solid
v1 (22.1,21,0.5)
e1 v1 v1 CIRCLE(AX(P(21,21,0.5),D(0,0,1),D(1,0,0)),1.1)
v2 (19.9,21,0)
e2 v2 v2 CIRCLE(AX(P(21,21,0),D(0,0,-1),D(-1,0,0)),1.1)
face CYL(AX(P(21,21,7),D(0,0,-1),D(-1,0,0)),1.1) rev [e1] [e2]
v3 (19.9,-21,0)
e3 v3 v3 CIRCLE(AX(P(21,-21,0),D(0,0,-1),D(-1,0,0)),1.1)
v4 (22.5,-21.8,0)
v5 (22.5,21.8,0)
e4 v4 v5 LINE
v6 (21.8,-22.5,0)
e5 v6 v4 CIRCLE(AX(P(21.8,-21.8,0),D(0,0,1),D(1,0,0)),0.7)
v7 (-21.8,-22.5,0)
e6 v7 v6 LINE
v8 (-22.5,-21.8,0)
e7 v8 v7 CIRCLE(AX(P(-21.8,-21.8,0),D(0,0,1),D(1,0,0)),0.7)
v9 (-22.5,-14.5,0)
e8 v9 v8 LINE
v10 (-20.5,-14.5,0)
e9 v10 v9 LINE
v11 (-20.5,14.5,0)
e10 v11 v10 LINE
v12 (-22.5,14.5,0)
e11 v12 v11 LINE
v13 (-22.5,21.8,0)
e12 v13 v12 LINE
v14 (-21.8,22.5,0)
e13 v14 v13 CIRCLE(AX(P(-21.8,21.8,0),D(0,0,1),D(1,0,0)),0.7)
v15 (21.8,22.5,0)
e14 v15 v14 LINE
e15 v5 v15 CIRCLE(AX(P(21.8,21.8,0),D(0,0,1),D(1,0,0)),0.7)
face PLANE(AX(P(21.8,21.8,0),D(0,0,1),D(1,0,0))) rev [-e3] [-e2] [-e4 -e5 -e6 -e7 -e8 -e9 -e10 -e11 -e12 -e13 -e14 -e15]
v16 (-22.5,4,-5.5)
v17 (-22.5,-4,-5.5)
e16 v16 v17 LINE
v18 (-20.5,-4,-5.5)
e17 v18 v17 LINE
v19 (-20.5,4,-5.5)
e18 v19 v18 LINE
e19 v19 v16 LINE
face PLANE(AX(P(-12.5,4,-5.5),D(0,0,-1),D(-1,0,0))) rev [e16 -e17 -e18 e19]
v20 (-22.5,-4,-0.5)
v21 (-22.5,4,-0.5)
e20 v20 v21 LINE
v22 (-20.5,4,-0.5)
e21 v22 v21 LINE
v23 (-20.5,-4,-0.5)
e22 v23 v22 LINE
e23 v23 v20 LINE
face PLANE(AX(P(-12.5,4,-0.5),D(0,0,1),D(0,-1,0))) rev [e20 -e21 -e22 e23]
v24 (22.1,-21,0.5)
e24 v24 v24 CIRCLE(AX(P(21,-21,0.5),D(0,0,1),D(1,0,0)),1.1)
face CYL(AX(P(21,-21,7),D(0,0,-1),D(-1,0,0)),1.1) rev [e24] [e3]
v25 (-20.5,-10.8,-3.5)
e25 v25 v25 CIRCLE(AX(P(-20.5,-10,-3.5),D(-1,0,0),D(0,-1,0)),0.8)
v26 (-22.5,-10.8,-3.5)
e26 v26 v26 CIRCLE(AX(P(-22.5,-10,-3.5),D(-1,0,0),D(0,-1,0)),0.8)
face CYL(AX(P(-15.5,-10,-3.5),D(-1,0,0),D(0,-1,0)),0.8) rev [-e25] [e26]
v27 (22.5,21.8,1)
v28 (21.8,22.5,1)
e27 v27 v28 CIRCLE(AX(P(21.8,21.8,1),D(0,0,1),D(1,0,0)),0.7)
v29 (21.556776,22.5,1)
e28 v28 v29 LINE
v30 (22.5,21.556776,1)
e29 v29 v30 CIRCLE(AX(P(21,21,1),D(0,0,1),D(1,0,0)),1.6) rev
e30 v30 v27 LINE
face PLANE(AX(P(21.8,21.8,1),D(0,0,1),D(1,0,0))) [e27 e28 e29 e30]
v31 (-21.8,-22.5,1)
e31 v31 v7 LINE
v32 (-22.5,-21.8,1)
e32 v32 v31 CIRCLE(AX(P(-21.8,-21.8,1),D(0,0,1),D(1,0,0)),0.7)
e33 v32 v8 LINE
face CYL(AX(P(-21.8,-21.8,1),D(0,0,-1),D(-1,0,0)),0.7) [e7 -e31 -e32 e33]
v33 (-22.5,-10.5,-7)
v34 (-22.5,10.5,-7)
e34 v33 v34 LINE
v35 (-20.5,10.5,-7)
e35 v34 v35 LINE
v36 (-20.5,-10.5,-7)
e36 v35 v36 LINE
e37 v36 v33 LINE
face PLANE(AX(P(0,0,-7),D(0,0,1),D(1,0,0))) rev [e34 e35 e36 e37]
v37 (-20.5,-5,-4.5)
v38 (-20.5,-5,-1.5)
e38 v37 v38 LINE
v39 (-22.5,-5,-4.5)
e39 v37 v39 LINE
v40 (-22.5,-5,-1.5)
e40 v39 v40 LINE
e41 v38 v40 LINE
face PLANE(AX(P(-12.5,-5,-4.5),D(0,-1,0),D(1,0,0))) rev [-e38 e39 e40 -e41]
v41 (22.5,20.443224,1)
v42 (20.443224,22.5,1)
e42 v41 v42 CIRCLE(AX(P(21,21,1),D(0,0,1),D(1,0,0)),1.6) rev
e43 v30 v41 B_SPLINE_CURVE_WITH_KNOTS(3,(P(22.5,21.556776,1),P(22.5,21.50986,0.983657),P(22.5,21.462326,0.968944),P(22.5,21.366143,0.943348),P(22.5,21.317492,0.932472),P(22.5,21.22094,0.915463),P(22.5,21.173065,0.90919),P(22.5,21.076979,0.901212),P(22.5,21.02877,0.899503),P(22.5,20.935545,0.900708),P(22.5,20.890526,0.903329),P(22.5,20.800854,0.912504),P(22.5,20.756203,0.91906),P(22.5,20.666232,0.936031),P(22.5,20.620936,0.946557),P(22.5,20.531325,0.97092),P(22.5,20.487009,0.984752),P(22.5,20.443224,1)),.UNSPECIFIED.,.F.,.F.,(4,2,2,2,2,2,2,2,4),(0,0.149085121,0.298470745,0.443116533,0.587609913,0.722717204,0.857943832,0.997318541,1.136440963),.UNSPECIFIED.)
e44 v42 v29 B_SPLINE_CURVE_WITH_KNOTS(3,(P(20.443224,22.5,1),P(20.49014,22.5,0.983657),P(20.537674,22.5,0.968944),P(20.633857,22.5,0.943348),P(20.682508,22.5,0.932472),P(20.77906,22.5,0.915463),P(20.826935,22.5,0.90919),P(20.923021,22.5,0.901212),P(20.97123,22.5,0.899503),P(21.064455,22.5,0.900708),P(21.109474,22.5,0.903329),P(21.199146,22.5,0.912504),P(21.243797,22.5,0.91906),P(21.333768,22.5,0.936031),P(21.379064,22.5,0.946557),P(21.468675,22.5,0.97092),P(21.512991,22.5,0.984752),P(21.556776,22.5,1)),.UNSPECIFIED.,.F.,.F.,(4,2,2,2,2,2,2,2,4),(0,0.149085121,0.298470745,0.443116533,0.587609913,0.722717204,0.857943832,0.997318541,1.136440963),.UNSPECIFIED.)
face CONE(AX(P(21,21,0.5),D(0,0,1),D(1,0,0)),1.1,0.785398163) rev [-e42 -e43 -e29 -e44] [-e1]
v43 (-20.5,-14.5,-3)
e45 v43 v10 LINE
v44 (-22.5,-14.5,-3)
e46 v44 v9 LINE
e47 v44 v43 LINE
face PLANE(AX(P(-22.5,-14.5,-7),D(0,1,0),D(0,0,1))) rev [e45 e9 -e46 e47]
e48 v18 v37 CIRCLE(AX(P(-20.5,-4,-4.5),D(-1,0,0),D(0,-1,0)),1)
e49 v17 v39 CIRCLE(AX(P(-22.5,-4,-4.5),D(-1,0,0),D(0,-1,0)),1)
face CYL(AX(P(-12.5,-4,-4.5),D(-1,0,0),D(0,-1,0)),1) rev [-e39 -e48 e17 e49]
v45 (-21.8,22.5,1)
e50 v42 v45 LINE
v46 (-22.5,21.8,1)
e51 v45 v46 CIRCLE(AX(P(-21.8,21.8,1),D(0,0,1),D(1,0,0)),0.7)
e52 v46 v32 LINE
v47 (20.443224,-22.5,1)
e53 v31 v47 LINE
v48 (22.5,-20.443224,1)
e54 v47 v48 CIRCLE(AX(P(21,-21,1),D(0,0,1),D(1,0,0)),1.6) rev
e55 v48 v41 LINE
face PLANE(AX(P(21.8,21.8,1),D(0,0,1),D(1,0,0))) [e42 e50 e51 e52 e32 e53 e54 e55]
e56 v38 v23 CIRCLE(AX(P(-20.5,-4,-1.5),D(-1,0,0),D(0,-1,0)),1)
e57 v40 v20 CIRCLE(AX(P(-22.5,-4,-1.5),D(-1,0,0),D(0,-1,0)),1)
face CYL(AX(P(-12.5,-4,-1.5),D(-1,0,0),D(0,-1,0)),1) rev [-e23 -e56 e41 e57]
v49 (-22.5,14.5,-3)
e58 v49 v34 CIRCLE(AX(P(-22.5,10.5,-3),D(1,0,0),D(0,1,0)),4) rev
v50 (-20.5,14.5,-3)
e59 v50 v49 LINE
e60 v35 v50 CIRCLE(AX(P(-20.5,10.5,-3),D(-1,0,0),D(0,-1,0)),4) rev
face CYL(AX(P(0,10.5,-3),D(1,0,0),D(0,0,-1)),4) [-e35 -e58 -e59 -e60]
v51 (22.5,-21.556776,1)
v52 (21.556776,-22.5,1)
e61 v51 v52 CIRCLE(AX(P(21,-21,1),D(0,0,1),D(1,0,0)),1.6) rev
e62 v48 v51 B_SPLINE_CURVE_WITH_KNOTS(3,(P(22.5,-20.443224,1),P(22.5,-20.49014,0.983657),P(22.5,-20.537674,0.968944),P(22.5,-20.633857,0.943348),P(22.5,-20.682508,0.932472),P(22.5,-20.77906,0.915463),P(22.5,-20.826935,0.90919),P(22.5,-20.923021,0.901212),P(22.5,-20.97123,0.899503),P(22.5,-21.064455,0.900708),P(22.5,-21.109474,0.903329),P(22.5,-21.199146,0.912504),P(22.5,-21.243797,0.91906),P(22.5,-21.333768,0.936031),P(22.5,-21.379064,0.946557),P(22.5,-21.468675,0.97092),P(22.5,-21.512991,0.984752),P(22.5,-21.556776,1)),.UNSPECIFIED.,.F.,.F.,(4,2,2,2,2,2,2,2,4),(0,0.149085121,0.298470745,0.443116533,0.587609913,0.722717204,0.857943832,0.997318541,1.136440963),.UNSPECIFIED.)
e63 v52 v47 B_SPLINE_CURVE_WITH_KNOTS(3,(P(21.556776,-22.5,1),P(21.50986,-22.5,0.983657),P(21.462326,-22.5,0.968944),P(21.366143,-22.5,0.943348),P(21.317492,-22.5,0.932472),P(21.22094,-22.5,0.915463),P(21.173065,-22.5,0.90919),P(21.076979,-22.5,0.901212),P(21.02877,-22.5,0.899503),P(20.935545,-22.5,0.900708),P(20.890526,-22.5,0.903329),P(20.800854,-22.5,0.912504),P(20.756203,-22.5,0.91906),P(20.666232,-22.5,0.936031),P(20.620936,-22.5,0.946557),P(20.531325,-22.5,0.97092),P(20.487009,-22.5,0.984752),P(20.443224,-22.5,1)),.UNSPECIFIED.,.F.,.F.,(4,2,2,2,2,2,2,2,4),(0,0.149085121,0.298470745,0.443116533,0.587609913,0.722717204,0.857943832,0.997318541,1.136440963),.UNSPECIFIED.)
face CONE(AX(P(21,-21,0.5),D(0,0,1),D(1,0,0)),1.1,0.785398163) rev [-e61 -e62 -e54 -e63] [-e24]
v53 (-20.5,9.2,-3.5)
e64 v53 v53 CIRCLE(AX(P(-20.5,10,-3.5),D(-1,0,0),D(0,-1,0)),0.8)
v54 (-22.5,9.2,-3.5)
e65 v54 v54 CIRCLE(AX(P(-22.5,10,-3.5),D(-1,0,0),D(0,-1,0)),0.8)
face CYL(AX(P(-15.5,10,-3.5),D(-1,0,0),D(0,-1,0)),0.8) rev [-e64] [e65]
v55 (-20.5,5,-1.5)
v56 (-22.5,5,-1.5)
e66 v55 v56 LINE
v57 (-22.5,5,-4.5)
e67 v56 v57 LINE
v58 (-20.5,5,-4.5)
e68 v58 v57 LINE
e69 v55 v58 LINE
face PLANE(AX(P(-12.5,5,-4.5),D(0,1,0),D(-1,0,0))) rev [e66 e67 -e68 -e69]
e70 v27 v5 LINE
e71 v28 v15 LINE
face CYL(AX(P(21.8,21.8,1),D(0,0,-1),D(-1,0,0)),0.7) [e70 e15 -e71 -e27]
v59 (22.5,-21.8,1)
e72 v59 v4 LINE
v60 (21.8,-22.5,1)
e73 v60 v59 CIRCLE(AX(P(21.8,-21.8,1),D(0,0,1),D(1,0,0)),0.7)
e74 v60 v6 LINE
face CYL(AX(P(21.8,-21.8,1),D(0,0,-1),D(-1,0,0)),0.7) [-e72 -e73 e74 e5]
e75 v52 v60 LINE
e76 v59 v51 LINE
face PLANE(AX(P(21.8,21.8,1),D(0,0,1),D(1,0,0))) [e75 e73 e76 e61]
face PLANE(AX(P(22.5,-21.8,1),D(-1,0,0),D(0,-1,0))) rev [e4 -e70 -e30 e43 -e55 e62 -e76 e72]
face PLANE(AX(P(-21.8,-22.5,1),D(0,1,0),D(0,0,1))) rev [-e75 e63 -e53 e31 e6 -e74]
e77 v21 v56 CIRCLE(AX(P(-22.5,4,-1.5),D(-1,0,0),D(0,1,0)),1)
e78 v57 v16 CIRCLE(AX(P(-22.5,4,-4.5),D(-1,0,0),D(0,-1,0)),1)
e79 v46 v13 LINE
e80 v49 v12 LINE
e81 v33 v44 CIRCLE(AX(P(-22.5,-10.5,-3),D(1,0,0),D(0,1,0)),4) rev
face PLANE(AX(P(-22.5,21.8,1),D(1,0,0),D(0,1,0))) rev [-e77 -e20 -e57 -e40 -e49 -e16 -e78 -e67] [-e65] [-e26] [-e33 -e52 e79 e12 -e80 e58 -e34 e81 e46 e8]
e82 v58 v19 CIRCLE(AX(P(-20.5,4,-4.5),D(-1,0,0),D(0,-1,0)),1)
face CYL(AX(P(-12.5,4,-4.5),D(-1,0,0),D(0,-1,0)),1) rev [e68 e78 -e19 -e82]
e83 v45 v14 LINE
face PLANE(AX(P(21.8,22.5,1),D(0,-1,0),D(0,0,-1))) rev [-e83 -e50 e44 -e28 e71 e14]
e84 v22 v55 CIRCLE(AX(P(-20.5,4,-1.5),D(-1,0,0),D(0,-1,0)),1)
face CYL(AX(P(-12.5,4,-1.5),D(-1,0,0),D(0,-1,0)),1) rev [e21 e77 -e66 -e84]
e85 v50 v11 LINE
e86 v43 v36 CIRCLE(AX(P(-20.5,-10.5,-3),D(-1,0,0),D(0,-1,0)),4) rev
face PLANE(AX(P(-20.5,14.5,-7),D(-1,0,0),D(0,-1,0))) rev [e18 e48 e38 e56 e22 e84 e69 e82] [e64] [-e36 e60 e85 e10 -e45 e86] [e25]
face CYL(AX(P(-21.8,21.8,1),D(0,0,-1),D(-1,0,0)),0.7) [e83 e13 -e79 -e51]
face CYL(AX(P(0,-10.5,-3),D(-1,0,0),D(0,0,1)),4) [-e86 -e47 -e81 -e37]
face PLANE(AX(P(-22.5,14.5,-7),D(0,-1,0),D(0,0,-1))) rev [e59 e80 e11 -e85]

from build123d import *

# Parameters (mm, degrees)
EXTRUDE_1_DEPTH     = 1
SKETCH_2_W          = 2
SKETCH_2_H          = 29
EXTRUDE_2_DEPTH     = 7
SKETCH_3_R          = 1.1
CUT_EXTRUDE_1_DEPTH = 7
SKETCH_4_R          = 0.8
CUT_EXTRUDE_2_DEPTH = 7
CHAMFER_1_SIZE      = 0.5
FILLET_1_R          = 4
CUT_EXTRUDE_3_DEPTH = 10


with BuildPart() as part:
    # 草图1 → 凸台-拉伸1 (new body)
    with BuildSketch(Plane.XY):
        with BuildLine():
            Line((22.5, -21.8), (22.5, 21.8))
            ThreePointArc((22.5, 21.8), (22.294974747, 22.294974747), (21.8, 22.5))
            Line((21.8, 22.5), (-21.8, 22.5))
            ThreePointArc((-21.8, 22.5), (-22.294974747, 22.294974747), (-22.5, 21.8))
            Line((-22.5, 21.8), (-22.5, -21.8))
            ThreePointArc((-22.5, -21.8), (-22.294974747, -22.294974747), (-21.8, -22.5))
            Line((-21.8, -22.5), (21.8, -22.5))
            ThreePointArc((21.8, -22.5), (22.294974747, -22.294974747), (22.5, -21.8))
        make_face()
    extrude(amount=EXTRUDE_1_DEPTH)

    # 草图2 → 凸台-拉伸2 (add)
    with BuildSketch(Plane(origin=(0, 0, 0), x_dir=(-1, 0, 0), z_dir=(0, 0, -1))):
        with Locations((21.5, 0)):
            Rectangle(SKETCH_2_W, SKETCH_2_H)
    extrude(amount=EXTRUDE_2_DEPTH)

    # 草图3 → 切除-拉伸1 (cut)
    with BuildSketch(Plane(origin=(0, 0, 0), x_dir=(-1, 0, 0), z_dir=(0, 0, -1))):
        with Locations((-21, 21)):
            Circle(SKETCH_3_R)
        with Locations((-21, -21)):
            Circle(SKETCH_3_R)
    extrude(amount=-CUT_EXTRUDE_1_DEPTH, mode=Mode.SUBTRACT)

    # 草图4 → 切除-拉伸2 (cut)
    with BuildSketch(Plane.ZY.offset(22.5)):
        with Locations(Location((-3.5, 10, 0), (0, 0, 270))):
            Circle(SKETCH_4_R)
        with Locations(Location((-3.5, -10, 0), (0, 0, 270))):
            Circle(SKETCH_4_R)
    extrude(amount=-CUT_EXTRUDE_2_DEPTH, mode=Mode.SUBTRACT)

    # 倒角1
    # the kernel refuses this chamfer: 0.5 mm, written as the material it takes off along each edge
    with BuildSketch(Plane(origin=(21, 21, 1), x_dir=(-1, 0, 0), z_dir=(0, -1, 0))) as chamfer_1_piece_1:
        Polygon((1.1 + CHAMFER_1_SIZE, 0), (1.1, CHAMFER_1_SIZE), (1.1, 0), align=None)
    revolve(axis=Axis((21, 21, 1), (0, 0, -1)), mode=Mode.SUBTRACT)
    with BuildSketch(Plane(origin=(21, -21, 1), x_dir=(-1, 0, 0), z_dir=(0, -1, 0))) as chamfer_1_piece_2:
        Polygon((1.1 + CHAMFER_1_SIZE, 0), (1.1, CHAMFER_1_SIZE), (1.1, 0), align=None)
    revolve(axis=Axis((21, -21, 1), (0, 0, -1)), mode=Mode.SUBTRACT)

    # 圆角1
    fillet_1_edges = [part.edges().sort_by_distance(p)[0] for p in [
        (-21.5, 14.5, -7),
        (-21.5, -14.5, -7),
    ]]
    fillet(fillet_1_edges, radius=FILLET_1_R)

    # 草图5 → 切除-拉伸3 (cut)
    with BuildSketch(Plane.ZY.offset(22.5)):
        with BuildLine():
            Line((-4.5, 5), (-1.5, 5))
            ThreePointArc((-1.5, 5), (-0.792893219, 4.707106781), (-0.5, 4))
            Line((-0.5, 4), (-0.5, -4))
            ThreePointArc((-0.5, -4), (-0.792893219, -4.707106781), (-1.5, -5))
            Line((-1.5, -5), (-4.5, -5))
            ThreePointArc((-4.5, -5), (-5.207106781, -4.707106781), (-5.5, -4))
            Line((-5.5, -4), (-5.5, 4))
            ThreePointArc((-5.5, 4), (-5.207106781, 4.707106781), (-4.5, 5))
        make_face()
    extrude(amount=-CUT_EXTRUDE_3_DEPTH, mode=Mode.SUBTRACT)


solid = part.part
